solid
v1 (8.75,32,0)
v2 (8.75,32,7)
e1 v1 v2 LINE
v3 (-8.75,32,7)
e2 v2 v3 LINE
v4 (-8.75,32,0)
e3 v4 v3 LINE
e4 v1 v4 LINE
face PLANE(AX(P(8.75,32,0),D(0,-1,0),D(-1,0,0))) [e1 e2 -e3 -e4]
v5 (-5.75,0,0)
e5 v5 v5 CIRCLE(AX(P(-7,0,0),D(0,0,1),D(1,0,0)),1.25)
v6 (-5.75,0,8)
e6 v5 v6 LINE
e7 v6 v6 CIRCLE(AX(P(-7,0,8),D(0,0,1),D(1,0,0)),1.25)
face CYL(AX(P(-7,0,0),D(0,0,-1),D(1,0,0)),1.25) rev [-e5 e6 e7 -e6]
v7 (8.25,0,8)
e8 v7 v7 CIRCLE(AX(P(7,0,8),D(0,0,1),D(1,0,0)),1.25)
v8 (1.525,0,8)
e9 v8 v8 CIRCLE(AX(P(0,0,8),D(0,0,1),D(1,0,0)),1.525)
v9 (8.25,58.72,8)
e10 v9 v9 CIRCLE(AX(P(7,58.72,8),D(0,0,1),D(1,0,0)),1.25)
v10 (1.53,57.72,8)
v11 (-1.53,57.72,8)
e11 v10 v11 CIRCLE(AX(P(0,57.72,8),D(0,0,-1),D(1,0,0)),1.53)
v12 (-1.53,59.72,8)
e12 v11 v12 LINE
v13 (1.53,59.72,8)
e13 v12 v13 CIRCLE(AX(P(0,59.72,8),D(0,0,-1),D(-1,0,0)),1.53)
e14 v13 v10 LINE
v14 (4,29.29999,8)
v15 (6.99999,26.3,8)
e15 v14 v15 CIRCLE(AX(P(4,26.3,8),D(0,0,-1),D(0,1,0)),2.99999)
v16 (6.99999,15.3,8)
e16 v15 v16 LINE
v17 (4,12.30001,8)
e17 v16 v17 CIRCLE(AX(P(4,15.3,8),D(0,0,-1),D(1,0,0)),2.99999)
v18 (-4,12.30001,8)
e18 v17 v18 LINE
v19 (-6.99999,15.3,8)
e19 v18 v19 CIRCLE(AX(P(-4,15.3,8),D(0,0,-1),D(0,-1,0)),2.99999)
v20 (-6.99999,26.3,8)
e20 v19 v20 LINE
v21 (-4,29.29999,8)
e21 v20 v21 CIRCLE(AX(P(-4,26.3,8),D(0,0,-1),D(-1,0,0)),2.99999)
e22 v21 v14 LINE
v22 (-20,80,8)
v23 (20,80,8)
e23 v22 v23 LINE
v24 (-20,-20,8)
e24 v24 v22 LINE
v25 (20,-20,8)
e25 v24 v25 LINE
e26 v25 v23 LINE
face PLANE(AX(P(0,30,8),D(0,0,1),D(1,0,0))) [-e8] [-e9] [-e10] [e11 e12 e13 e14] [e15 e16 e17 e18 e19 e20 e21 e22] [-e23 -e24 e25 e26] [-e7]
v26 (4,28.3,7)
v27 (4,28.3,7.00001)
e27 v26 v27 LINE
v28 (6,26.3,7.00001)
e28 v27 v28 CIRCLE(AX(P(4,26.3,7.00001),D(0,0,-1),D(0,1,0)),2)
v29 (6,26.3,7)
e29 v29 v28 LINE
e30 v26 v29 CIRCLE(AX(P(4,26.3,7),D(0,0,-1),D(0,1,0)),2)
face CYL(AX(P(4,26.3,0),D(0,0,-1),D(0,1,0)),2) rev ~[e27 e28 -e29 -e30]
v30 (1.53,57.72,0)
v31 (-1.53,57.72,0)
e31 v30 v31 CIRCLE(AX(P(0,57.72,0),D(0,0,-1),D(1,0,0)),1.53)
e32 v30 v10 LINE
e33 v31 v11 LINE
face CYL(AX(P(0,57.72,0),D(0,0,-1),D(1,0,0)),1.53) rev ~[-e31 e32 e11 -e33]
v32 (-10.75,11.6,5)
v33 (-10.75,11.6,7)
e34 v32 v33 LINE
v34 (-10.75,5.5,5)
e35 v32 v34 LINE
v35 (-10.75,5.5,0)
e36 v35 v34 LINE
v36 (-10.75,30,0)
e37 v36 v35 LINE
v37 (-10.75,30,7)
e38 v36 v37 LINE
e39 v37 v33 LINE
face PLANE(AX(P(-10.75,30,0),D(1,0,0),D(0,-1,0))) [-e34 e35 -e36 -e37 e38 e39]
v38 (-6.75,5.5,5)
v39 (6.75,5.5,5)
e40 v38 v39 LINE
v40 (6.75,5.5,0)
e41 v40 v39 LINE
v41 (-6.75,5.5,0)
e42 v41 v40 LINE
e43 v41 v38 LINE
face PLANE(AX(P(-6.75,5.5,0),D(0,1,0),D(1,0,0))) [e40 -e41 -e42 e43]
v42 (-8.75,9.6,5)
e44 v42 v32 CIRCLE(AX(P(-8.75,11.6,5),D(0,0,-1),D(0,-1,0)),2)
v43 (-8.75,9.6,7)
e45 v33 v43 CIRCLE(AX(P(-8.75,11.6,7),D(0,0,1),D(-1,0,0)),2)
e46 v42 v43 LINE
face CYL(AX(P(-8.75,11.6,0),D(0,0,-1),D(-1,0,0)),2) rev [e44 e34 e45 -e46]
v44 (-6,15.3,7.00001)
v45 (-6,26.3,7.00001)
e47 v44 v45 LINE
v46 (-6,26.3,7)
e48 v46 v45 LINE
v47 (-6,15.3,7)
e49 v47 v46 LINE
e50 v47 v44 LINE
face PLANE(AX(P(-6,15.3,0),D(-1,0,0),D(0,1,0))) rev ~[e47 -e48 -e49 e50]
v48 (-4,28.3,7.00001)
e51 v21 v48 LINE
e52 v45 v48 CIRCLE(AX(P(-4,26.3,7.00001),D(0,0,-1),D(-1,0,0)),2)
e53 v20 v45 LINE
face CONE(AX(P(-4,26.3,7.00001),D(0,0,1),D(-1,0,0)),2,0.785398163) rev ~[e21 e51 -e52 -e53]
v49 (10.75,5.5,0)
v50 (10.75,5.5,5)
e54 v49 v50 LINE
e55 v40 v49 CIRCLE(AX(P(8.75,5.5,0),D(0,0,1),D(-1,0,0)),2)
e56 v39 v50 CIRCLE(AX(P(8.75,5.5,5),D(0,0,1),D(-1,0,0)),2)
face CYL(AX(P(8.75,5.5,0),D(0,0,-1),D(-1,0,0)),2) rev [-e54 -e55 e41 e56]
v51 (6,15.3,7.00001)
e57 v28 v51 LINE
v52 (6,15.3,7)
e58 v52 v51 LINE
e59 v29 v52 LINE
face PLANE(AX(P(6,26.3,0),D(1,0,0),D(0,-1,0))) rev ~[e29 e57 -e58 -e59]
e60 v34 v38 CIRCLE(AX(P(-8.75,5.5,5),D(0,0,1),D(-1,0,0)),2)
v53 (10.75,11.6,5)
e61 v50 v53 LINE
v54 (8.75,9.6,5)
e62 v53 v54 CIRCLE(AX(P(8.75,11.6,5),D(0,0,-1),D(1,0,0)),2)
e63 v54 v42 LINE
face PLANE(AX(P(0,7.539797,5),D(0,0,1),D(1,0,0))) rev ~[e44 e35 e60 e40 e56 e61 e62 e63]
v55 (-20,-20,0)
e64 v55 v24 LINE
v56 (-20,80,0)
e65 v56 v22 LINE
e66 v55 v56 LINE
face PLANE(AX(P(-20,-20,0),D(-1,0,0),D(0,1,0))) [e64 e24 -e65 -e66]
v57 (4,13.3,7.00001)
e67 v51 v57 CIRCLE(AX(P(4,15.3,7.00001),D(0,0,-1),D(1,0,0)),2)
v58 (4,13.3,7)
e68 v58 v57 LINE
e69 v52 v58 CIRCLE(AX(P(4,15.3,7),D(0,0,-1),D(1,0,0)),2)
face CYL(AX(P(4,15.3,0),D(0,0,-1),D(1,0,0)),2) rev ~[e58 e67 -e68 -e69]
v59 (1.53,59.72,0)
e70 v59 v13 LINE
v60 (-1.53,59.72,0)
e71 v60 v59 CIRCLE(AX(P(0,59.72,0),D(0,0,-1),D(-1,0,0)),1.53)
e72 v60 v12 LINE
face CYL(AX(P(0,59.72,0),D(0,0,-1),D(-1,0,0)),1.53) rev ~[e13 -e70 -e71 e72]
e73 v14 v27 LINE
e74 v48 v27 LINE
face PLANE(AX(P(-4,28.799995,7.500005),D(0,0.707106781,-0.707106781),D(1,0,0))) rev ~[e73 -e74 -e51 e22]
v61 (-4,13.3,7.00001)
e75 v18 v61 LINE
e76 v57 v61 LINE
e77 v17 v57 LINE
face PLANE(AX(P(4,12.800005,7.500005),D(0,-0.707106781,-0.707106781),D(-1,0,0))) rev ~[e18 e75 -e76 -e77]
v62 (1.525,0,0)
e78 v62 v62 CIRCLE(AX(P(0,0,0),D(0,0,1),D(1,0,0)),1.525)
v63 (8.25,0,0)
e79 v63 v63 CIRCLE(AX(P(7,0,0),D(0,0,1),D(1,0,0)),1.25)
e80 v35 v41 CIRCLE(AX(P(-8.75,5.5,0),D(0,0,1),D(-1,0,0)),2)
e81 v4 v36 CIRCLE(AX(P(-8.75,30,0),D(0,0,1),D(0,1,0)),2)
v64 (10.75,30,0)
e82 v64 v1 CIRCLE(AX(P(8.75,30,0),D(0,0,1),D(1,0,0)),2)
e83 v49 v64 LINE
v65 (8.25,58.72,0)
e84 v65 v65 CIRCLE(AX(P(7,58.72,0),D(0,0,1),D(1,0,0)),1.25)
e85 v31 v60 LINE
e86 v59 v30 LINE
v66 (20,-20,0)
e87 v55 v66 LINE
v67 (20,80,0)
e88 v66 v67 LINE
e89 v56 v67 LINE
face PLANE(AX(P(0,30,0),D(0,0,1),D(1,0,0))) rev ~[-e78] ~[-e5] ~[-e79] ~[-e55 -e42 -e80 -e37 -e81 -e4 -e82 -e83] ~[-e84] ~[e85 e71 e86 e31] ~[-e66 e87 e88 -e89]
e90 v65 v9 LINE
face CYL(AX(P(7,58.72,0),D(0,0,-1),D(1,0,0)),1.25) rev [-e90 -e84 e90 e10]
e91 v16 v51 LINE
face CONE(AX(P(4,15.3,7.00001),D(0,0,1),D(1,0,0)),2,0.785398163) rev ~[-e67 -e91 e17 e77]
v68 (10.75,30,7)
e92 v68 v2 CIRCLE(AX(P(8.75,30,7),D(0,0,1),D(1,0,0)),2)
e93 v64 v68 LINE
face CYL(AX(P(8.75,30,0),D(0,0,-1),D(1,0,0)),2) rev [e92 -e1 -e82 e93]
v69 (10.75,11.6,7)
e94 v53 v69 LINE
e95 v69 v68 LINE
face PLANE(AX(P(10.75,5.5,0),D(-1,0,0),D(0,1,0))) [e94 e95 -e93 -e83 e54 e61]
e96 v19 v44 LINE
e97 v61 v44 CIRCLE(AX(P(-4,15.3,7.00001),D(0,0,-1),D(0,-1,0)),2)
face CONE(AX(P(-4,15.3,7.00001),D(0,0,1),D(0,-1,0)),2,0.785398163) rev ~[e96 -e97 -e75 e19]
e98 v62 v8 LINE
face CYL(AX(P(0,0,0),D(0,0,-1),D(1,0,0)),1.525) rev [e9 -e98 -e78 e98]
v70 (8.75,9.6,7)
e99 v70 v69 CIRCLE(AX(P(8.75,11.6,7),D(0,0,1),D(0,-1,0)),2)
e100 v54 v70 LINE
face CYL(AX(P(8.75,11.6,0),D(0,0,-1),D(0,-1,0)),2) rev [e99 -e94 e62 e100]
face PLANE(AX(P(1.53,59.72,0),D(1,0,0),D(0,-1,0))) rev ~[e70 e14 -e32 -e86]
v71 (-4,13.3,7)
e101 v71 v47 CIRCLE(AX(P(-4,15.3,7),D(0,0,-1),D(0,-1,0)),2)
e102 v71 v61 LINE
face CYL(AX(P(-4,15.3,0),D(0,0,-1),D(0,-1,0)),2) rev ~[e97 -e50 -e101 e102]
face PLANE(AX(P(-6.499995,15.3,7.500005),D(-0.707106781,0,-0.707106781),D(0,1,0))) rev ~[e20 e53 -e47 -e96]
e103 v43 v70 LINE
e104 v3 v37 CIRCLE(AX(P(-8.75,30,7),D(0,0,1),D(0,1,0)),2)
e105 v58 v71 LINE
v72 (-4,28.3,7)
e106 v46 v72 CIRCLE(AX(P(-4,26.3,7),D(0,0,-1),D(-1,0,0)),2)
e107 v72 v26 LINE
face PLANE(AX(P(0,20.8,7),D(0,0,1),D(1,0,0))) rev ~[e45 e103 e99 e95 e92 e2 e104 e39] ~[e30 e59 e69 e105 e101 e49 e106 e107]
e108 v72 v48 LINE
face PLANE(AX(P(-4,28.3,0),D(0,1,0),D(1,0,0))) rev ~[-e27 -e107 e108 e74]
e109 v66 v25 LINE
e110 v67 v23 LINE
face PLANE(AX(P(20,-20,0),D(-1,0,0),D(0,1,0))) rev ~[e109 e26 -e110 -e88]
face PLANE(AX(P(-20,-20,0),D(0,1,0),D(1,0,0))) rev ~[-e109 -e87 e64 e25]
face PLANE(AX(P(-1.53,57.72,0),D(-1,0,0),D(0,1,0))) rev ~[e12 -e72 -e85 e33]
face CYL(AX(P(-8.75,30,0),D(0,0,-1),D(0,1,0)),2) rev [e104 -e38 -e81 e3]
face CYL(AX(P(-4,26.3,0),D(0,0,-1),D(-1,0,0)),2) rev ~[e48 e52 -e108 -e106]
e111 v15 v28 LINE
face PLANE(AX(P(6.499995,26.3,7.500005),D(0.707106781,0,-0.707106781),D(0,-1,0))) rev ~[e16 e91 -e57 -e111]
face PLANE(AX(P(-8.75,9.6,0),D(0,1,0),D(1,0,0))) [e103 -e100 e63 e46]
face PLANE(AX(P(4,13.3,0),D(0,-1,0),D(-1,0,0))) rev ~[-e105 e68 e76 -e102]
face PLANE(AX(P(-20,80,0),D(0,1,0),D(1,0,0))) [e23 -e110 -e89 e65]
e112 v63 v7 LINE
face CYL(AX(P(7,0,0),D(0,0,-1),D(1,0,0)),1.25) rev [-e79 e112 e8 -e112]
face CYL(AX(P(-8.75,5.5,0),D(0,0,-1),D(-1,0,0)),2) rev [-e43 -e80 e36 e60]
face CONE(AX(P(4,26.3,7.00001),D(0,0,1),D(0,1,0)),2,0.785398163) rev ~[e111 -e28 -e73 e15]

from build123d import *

# Parameters (mm, degrees)
F0_W     = 40
F0_H     = 100
F0_R     = 1.25
F0_R_2   = 1.525
F1_DEPTH = 8
F2_DEPTH = 7
F3_DEPTH = 5
F4_SIZE  = 0.99999


# Not quite as in the source:
# - a fillet or chamfer is up to 0.001 mm smaller than in the source, because OpenCascade refuses the exact size


with BuildPart() as f1:
    # F0 (on Top) → F1 (new body)
    with BuildSketch(Plane.XY):
        with Locations((0, 30)):
            Rectangle(F0_W, F0_H)
        with Locations((-7, 0)):
            Circle(F0_R, mode=Mode.SUBTRACT)
        Circle(F0_R_2, mode=Mode.SUBTRACT)
        with Locations((7, 0)):
            Circle(F0_R, mode=Mode.SUBTRACT)
        with BuildLine():
            ThreePointArc((-10.75, 30), (-10.1642135624, 31.4142135624), (-8.75, 32))
            Line((-8.75, 32), (8.75, 32))
            ThreePointArc((8.75, 32), (10.1642135624, 31.4142135624), (10.75, 30))
            Line((10.75, 30), (10.75, 11.6))
            Line((10.75, 11.6), (10.75, 5.5))
            ThreePointArc((10.75, 5.5), (8.75, 3.5), (6.75, 5.5))
            Line((6.75, 5.5), (-6.75, 5.5))
            ThreePointArc((-6.75, 5.5), (-8.75, 3.5), (-10.75, 5.5))
            Line((-10.75, 5.5), (-10.75, 11.6))
            Line((-10.75, 11.6), (-10.75, 30))
        make_face(mode=Mode.SUBTRACT)
        with BuildLine():
            Line((-1.53, 57.72), (-1.53, 59.72))
            ThreePointArc((-1.53, 59.72), (0, 61.25), (1.53, 59.72))
            Line((1.53, 59.72), (1.53, 57.72))
            ThreePointArc((1.53, 57.72), (0, 56.19), (-1.53, 57.72))
        make_face(mode=Mode.SUBTRACT)
        with Locations((7, 58.72)):
            Circle(F0_R, mode=Mode.SUBTRACT)
        with BuildLine():
            Line((8.75, 32), (-8.75, 32))
            ThreePointArc((-8.75, 32), (-10.1642135624, 31.4142135624), (-10.75, 30))
            Line((-10.75, 30), (-10.75, 11.6))
            ThreePointArc((-10.75, 11.6), (-10.1642135624, 10.1857864376), (-8.75, 9.6))
            Line((-8.75, 9.6), (8.75, 9.6))
            ThreePointArc((8.75, 9.6), (10.1642135624, 10.1857864376), (10.75, 11.6))
            Line((10.75, 11.6), (10.75, 30))
            ThreePointArc((10.75, 30), (10.1642135624, 31.4142135624), (8.75, 32))
        make_face()
        with BuildLine():
            ThreePointArc((-6, 26.3), (-5.4142135624, 27.7142135624), (-4, 28.3))
            Line((-4, 28.3), (4, 28.3))
            ThreePointArc((4, 28.3), (5.4142135624, 27.7142135624), (6, 26.3))
            Line((6, 26.3), (6, 15.3))
            ThreePointArc((6, 15.3), (5.4142135624, 13.8857864376), (4, 13.3))
            Line((4, 13.3), (-4, 13.3))
            ThreePointArc((-4, 13.3), (-5.4142135624, 13.8857864376), (-6, 15.3))
            Line((-6, 15.3), (-6, 26.3))
        make_face(mode=Mode.SUBTRACT)
        with BuildLine():
            ThreePointArc((-8.75, 9.6), (-10.1642135624, 10.1857864376), (-10.75, 11.6))
            Line((-10.75, 11.6), (-10.75, 5.5))
            ThreePointArc((-10.75, 5.5), (-8.75, 3.5), (-6.75, 5.5))
            Line((-6.75, 5.5), (6.75, 5.5))
            ThreePointArc((6.75, 5.5), (8.75, 3.5), (10.75, 5.5))
            Line((10.75, 5.5), (10.75, 11.6))
            ThreePointArc((10.75, 11.6), (10.1642135624, 10.1857864376), (8.75, 9.6))
            Line((8.75, 9.6), (-8.75, 9.6))
        make_face()
    extrude(amount=F1_DEPTH)

    # F0 (on Top) → F2 (cut)
    with BuildSketch(Plane.XY):
        with BuildLine():
            Line((8.75, 32), (-8.75, 32))
            ThreePointArc((-8.75, 32), (-10.1642135624, 31.4142135624), (-10.75, 30))
            Line((-10.75, 30), (-10.75, 11.6))
            ThreePointArc((-10.75, 11.6), (-10.1642135624, 10.1857864376), (-8.75, 9.6))
            Line((-8.75, 9.6), (8.75, 9.6))
            ThreePointArc((8.75, 9.6), (10.1642135624, 10.1857864376), (10.75, 11.6))
            Line((10.75, 11.6), (10.75, 30))
            ThreePointArc((10.75, 30), (10.1642135624, 31.4142135624), (8.75, 32))
        make_face()
        with BuildLine():
            ThreePointArc((-6, 26.3), (-5.4142135624, 27.7142135624), (-4, 28.3))
            Line((-4, 28.3), (4, 28.3))
            ThreePointArc((4, 28.3), (5.4142135624, 27.7142135624), (6, 26.3))
            Line((6, 26.3), (6, 15.3))
            ThreePointArc((6, 15.3), (5.4142135624, 13.8857864376), (4, 13.3))
            Line((4, 13.3), (-4, 13.3))
            ThreePointArc((-4, 13.3), (-5.4142135624, 13.8857864376), (-6, 15.3))
            Line((-6, 15.3), (-6, 26.3))
        make_face(mode=Mode.SUBTRACT)
    extrude(amount=F2_DEPTH, mode=Mode.SUBTRACT)

    # F0 (on Top) → F3 (cut)
    with BuildSketch(Plane.XY):
        with BuildLine():
            ThreePointArc((-8.75, 9.6), (-10.1642135624, 10.1857864376), (-10.75, 11.6))
            Line((-10.75, 11.6), (-10.75, 5.5))
            ThreePointArc((-10.75, 5.5), (-8.75, 3.5), (-6.75, 5.5))
            Line((-6.75, 5.5), (6.75, 5.5))
            ThreePointArc((6.75, 5.5), (8.75, 3.5), (10.75, 5.5))
            Line((10.75, 5.5), (10.75, 11.6))
            ThreePointArc((10.75, 11.6), (10.1642135624, 10.1857864376), (8.75, 9.6))
            Line((8.75, 9.6), (-8.75, 9.6))
        make_face()
    extrude(amount=F3_DEPTH, mode=Mode.SUBTRACT)

    # F4 (size 1 in the source; OpenCascade refuses exactly that, so slightly less here)
    f4_edges = [f1.edges().sort_by_distance(p)[0] for p in [
        (6, 20.8, 8),
        (5.414214, 13.885786, 8),
        (0, 13.3, 8),
        (-5.414214, 13.885786, 8),
        (-6, 20.8, 8),
        (-5.414214, 27.714214, 8),
        (0, 28.3, 8),
        (5.414214, 27.714214, 8),
    ]]
    chamfer(f4_edges, length=F4_SIZE)


solid = f1.part
